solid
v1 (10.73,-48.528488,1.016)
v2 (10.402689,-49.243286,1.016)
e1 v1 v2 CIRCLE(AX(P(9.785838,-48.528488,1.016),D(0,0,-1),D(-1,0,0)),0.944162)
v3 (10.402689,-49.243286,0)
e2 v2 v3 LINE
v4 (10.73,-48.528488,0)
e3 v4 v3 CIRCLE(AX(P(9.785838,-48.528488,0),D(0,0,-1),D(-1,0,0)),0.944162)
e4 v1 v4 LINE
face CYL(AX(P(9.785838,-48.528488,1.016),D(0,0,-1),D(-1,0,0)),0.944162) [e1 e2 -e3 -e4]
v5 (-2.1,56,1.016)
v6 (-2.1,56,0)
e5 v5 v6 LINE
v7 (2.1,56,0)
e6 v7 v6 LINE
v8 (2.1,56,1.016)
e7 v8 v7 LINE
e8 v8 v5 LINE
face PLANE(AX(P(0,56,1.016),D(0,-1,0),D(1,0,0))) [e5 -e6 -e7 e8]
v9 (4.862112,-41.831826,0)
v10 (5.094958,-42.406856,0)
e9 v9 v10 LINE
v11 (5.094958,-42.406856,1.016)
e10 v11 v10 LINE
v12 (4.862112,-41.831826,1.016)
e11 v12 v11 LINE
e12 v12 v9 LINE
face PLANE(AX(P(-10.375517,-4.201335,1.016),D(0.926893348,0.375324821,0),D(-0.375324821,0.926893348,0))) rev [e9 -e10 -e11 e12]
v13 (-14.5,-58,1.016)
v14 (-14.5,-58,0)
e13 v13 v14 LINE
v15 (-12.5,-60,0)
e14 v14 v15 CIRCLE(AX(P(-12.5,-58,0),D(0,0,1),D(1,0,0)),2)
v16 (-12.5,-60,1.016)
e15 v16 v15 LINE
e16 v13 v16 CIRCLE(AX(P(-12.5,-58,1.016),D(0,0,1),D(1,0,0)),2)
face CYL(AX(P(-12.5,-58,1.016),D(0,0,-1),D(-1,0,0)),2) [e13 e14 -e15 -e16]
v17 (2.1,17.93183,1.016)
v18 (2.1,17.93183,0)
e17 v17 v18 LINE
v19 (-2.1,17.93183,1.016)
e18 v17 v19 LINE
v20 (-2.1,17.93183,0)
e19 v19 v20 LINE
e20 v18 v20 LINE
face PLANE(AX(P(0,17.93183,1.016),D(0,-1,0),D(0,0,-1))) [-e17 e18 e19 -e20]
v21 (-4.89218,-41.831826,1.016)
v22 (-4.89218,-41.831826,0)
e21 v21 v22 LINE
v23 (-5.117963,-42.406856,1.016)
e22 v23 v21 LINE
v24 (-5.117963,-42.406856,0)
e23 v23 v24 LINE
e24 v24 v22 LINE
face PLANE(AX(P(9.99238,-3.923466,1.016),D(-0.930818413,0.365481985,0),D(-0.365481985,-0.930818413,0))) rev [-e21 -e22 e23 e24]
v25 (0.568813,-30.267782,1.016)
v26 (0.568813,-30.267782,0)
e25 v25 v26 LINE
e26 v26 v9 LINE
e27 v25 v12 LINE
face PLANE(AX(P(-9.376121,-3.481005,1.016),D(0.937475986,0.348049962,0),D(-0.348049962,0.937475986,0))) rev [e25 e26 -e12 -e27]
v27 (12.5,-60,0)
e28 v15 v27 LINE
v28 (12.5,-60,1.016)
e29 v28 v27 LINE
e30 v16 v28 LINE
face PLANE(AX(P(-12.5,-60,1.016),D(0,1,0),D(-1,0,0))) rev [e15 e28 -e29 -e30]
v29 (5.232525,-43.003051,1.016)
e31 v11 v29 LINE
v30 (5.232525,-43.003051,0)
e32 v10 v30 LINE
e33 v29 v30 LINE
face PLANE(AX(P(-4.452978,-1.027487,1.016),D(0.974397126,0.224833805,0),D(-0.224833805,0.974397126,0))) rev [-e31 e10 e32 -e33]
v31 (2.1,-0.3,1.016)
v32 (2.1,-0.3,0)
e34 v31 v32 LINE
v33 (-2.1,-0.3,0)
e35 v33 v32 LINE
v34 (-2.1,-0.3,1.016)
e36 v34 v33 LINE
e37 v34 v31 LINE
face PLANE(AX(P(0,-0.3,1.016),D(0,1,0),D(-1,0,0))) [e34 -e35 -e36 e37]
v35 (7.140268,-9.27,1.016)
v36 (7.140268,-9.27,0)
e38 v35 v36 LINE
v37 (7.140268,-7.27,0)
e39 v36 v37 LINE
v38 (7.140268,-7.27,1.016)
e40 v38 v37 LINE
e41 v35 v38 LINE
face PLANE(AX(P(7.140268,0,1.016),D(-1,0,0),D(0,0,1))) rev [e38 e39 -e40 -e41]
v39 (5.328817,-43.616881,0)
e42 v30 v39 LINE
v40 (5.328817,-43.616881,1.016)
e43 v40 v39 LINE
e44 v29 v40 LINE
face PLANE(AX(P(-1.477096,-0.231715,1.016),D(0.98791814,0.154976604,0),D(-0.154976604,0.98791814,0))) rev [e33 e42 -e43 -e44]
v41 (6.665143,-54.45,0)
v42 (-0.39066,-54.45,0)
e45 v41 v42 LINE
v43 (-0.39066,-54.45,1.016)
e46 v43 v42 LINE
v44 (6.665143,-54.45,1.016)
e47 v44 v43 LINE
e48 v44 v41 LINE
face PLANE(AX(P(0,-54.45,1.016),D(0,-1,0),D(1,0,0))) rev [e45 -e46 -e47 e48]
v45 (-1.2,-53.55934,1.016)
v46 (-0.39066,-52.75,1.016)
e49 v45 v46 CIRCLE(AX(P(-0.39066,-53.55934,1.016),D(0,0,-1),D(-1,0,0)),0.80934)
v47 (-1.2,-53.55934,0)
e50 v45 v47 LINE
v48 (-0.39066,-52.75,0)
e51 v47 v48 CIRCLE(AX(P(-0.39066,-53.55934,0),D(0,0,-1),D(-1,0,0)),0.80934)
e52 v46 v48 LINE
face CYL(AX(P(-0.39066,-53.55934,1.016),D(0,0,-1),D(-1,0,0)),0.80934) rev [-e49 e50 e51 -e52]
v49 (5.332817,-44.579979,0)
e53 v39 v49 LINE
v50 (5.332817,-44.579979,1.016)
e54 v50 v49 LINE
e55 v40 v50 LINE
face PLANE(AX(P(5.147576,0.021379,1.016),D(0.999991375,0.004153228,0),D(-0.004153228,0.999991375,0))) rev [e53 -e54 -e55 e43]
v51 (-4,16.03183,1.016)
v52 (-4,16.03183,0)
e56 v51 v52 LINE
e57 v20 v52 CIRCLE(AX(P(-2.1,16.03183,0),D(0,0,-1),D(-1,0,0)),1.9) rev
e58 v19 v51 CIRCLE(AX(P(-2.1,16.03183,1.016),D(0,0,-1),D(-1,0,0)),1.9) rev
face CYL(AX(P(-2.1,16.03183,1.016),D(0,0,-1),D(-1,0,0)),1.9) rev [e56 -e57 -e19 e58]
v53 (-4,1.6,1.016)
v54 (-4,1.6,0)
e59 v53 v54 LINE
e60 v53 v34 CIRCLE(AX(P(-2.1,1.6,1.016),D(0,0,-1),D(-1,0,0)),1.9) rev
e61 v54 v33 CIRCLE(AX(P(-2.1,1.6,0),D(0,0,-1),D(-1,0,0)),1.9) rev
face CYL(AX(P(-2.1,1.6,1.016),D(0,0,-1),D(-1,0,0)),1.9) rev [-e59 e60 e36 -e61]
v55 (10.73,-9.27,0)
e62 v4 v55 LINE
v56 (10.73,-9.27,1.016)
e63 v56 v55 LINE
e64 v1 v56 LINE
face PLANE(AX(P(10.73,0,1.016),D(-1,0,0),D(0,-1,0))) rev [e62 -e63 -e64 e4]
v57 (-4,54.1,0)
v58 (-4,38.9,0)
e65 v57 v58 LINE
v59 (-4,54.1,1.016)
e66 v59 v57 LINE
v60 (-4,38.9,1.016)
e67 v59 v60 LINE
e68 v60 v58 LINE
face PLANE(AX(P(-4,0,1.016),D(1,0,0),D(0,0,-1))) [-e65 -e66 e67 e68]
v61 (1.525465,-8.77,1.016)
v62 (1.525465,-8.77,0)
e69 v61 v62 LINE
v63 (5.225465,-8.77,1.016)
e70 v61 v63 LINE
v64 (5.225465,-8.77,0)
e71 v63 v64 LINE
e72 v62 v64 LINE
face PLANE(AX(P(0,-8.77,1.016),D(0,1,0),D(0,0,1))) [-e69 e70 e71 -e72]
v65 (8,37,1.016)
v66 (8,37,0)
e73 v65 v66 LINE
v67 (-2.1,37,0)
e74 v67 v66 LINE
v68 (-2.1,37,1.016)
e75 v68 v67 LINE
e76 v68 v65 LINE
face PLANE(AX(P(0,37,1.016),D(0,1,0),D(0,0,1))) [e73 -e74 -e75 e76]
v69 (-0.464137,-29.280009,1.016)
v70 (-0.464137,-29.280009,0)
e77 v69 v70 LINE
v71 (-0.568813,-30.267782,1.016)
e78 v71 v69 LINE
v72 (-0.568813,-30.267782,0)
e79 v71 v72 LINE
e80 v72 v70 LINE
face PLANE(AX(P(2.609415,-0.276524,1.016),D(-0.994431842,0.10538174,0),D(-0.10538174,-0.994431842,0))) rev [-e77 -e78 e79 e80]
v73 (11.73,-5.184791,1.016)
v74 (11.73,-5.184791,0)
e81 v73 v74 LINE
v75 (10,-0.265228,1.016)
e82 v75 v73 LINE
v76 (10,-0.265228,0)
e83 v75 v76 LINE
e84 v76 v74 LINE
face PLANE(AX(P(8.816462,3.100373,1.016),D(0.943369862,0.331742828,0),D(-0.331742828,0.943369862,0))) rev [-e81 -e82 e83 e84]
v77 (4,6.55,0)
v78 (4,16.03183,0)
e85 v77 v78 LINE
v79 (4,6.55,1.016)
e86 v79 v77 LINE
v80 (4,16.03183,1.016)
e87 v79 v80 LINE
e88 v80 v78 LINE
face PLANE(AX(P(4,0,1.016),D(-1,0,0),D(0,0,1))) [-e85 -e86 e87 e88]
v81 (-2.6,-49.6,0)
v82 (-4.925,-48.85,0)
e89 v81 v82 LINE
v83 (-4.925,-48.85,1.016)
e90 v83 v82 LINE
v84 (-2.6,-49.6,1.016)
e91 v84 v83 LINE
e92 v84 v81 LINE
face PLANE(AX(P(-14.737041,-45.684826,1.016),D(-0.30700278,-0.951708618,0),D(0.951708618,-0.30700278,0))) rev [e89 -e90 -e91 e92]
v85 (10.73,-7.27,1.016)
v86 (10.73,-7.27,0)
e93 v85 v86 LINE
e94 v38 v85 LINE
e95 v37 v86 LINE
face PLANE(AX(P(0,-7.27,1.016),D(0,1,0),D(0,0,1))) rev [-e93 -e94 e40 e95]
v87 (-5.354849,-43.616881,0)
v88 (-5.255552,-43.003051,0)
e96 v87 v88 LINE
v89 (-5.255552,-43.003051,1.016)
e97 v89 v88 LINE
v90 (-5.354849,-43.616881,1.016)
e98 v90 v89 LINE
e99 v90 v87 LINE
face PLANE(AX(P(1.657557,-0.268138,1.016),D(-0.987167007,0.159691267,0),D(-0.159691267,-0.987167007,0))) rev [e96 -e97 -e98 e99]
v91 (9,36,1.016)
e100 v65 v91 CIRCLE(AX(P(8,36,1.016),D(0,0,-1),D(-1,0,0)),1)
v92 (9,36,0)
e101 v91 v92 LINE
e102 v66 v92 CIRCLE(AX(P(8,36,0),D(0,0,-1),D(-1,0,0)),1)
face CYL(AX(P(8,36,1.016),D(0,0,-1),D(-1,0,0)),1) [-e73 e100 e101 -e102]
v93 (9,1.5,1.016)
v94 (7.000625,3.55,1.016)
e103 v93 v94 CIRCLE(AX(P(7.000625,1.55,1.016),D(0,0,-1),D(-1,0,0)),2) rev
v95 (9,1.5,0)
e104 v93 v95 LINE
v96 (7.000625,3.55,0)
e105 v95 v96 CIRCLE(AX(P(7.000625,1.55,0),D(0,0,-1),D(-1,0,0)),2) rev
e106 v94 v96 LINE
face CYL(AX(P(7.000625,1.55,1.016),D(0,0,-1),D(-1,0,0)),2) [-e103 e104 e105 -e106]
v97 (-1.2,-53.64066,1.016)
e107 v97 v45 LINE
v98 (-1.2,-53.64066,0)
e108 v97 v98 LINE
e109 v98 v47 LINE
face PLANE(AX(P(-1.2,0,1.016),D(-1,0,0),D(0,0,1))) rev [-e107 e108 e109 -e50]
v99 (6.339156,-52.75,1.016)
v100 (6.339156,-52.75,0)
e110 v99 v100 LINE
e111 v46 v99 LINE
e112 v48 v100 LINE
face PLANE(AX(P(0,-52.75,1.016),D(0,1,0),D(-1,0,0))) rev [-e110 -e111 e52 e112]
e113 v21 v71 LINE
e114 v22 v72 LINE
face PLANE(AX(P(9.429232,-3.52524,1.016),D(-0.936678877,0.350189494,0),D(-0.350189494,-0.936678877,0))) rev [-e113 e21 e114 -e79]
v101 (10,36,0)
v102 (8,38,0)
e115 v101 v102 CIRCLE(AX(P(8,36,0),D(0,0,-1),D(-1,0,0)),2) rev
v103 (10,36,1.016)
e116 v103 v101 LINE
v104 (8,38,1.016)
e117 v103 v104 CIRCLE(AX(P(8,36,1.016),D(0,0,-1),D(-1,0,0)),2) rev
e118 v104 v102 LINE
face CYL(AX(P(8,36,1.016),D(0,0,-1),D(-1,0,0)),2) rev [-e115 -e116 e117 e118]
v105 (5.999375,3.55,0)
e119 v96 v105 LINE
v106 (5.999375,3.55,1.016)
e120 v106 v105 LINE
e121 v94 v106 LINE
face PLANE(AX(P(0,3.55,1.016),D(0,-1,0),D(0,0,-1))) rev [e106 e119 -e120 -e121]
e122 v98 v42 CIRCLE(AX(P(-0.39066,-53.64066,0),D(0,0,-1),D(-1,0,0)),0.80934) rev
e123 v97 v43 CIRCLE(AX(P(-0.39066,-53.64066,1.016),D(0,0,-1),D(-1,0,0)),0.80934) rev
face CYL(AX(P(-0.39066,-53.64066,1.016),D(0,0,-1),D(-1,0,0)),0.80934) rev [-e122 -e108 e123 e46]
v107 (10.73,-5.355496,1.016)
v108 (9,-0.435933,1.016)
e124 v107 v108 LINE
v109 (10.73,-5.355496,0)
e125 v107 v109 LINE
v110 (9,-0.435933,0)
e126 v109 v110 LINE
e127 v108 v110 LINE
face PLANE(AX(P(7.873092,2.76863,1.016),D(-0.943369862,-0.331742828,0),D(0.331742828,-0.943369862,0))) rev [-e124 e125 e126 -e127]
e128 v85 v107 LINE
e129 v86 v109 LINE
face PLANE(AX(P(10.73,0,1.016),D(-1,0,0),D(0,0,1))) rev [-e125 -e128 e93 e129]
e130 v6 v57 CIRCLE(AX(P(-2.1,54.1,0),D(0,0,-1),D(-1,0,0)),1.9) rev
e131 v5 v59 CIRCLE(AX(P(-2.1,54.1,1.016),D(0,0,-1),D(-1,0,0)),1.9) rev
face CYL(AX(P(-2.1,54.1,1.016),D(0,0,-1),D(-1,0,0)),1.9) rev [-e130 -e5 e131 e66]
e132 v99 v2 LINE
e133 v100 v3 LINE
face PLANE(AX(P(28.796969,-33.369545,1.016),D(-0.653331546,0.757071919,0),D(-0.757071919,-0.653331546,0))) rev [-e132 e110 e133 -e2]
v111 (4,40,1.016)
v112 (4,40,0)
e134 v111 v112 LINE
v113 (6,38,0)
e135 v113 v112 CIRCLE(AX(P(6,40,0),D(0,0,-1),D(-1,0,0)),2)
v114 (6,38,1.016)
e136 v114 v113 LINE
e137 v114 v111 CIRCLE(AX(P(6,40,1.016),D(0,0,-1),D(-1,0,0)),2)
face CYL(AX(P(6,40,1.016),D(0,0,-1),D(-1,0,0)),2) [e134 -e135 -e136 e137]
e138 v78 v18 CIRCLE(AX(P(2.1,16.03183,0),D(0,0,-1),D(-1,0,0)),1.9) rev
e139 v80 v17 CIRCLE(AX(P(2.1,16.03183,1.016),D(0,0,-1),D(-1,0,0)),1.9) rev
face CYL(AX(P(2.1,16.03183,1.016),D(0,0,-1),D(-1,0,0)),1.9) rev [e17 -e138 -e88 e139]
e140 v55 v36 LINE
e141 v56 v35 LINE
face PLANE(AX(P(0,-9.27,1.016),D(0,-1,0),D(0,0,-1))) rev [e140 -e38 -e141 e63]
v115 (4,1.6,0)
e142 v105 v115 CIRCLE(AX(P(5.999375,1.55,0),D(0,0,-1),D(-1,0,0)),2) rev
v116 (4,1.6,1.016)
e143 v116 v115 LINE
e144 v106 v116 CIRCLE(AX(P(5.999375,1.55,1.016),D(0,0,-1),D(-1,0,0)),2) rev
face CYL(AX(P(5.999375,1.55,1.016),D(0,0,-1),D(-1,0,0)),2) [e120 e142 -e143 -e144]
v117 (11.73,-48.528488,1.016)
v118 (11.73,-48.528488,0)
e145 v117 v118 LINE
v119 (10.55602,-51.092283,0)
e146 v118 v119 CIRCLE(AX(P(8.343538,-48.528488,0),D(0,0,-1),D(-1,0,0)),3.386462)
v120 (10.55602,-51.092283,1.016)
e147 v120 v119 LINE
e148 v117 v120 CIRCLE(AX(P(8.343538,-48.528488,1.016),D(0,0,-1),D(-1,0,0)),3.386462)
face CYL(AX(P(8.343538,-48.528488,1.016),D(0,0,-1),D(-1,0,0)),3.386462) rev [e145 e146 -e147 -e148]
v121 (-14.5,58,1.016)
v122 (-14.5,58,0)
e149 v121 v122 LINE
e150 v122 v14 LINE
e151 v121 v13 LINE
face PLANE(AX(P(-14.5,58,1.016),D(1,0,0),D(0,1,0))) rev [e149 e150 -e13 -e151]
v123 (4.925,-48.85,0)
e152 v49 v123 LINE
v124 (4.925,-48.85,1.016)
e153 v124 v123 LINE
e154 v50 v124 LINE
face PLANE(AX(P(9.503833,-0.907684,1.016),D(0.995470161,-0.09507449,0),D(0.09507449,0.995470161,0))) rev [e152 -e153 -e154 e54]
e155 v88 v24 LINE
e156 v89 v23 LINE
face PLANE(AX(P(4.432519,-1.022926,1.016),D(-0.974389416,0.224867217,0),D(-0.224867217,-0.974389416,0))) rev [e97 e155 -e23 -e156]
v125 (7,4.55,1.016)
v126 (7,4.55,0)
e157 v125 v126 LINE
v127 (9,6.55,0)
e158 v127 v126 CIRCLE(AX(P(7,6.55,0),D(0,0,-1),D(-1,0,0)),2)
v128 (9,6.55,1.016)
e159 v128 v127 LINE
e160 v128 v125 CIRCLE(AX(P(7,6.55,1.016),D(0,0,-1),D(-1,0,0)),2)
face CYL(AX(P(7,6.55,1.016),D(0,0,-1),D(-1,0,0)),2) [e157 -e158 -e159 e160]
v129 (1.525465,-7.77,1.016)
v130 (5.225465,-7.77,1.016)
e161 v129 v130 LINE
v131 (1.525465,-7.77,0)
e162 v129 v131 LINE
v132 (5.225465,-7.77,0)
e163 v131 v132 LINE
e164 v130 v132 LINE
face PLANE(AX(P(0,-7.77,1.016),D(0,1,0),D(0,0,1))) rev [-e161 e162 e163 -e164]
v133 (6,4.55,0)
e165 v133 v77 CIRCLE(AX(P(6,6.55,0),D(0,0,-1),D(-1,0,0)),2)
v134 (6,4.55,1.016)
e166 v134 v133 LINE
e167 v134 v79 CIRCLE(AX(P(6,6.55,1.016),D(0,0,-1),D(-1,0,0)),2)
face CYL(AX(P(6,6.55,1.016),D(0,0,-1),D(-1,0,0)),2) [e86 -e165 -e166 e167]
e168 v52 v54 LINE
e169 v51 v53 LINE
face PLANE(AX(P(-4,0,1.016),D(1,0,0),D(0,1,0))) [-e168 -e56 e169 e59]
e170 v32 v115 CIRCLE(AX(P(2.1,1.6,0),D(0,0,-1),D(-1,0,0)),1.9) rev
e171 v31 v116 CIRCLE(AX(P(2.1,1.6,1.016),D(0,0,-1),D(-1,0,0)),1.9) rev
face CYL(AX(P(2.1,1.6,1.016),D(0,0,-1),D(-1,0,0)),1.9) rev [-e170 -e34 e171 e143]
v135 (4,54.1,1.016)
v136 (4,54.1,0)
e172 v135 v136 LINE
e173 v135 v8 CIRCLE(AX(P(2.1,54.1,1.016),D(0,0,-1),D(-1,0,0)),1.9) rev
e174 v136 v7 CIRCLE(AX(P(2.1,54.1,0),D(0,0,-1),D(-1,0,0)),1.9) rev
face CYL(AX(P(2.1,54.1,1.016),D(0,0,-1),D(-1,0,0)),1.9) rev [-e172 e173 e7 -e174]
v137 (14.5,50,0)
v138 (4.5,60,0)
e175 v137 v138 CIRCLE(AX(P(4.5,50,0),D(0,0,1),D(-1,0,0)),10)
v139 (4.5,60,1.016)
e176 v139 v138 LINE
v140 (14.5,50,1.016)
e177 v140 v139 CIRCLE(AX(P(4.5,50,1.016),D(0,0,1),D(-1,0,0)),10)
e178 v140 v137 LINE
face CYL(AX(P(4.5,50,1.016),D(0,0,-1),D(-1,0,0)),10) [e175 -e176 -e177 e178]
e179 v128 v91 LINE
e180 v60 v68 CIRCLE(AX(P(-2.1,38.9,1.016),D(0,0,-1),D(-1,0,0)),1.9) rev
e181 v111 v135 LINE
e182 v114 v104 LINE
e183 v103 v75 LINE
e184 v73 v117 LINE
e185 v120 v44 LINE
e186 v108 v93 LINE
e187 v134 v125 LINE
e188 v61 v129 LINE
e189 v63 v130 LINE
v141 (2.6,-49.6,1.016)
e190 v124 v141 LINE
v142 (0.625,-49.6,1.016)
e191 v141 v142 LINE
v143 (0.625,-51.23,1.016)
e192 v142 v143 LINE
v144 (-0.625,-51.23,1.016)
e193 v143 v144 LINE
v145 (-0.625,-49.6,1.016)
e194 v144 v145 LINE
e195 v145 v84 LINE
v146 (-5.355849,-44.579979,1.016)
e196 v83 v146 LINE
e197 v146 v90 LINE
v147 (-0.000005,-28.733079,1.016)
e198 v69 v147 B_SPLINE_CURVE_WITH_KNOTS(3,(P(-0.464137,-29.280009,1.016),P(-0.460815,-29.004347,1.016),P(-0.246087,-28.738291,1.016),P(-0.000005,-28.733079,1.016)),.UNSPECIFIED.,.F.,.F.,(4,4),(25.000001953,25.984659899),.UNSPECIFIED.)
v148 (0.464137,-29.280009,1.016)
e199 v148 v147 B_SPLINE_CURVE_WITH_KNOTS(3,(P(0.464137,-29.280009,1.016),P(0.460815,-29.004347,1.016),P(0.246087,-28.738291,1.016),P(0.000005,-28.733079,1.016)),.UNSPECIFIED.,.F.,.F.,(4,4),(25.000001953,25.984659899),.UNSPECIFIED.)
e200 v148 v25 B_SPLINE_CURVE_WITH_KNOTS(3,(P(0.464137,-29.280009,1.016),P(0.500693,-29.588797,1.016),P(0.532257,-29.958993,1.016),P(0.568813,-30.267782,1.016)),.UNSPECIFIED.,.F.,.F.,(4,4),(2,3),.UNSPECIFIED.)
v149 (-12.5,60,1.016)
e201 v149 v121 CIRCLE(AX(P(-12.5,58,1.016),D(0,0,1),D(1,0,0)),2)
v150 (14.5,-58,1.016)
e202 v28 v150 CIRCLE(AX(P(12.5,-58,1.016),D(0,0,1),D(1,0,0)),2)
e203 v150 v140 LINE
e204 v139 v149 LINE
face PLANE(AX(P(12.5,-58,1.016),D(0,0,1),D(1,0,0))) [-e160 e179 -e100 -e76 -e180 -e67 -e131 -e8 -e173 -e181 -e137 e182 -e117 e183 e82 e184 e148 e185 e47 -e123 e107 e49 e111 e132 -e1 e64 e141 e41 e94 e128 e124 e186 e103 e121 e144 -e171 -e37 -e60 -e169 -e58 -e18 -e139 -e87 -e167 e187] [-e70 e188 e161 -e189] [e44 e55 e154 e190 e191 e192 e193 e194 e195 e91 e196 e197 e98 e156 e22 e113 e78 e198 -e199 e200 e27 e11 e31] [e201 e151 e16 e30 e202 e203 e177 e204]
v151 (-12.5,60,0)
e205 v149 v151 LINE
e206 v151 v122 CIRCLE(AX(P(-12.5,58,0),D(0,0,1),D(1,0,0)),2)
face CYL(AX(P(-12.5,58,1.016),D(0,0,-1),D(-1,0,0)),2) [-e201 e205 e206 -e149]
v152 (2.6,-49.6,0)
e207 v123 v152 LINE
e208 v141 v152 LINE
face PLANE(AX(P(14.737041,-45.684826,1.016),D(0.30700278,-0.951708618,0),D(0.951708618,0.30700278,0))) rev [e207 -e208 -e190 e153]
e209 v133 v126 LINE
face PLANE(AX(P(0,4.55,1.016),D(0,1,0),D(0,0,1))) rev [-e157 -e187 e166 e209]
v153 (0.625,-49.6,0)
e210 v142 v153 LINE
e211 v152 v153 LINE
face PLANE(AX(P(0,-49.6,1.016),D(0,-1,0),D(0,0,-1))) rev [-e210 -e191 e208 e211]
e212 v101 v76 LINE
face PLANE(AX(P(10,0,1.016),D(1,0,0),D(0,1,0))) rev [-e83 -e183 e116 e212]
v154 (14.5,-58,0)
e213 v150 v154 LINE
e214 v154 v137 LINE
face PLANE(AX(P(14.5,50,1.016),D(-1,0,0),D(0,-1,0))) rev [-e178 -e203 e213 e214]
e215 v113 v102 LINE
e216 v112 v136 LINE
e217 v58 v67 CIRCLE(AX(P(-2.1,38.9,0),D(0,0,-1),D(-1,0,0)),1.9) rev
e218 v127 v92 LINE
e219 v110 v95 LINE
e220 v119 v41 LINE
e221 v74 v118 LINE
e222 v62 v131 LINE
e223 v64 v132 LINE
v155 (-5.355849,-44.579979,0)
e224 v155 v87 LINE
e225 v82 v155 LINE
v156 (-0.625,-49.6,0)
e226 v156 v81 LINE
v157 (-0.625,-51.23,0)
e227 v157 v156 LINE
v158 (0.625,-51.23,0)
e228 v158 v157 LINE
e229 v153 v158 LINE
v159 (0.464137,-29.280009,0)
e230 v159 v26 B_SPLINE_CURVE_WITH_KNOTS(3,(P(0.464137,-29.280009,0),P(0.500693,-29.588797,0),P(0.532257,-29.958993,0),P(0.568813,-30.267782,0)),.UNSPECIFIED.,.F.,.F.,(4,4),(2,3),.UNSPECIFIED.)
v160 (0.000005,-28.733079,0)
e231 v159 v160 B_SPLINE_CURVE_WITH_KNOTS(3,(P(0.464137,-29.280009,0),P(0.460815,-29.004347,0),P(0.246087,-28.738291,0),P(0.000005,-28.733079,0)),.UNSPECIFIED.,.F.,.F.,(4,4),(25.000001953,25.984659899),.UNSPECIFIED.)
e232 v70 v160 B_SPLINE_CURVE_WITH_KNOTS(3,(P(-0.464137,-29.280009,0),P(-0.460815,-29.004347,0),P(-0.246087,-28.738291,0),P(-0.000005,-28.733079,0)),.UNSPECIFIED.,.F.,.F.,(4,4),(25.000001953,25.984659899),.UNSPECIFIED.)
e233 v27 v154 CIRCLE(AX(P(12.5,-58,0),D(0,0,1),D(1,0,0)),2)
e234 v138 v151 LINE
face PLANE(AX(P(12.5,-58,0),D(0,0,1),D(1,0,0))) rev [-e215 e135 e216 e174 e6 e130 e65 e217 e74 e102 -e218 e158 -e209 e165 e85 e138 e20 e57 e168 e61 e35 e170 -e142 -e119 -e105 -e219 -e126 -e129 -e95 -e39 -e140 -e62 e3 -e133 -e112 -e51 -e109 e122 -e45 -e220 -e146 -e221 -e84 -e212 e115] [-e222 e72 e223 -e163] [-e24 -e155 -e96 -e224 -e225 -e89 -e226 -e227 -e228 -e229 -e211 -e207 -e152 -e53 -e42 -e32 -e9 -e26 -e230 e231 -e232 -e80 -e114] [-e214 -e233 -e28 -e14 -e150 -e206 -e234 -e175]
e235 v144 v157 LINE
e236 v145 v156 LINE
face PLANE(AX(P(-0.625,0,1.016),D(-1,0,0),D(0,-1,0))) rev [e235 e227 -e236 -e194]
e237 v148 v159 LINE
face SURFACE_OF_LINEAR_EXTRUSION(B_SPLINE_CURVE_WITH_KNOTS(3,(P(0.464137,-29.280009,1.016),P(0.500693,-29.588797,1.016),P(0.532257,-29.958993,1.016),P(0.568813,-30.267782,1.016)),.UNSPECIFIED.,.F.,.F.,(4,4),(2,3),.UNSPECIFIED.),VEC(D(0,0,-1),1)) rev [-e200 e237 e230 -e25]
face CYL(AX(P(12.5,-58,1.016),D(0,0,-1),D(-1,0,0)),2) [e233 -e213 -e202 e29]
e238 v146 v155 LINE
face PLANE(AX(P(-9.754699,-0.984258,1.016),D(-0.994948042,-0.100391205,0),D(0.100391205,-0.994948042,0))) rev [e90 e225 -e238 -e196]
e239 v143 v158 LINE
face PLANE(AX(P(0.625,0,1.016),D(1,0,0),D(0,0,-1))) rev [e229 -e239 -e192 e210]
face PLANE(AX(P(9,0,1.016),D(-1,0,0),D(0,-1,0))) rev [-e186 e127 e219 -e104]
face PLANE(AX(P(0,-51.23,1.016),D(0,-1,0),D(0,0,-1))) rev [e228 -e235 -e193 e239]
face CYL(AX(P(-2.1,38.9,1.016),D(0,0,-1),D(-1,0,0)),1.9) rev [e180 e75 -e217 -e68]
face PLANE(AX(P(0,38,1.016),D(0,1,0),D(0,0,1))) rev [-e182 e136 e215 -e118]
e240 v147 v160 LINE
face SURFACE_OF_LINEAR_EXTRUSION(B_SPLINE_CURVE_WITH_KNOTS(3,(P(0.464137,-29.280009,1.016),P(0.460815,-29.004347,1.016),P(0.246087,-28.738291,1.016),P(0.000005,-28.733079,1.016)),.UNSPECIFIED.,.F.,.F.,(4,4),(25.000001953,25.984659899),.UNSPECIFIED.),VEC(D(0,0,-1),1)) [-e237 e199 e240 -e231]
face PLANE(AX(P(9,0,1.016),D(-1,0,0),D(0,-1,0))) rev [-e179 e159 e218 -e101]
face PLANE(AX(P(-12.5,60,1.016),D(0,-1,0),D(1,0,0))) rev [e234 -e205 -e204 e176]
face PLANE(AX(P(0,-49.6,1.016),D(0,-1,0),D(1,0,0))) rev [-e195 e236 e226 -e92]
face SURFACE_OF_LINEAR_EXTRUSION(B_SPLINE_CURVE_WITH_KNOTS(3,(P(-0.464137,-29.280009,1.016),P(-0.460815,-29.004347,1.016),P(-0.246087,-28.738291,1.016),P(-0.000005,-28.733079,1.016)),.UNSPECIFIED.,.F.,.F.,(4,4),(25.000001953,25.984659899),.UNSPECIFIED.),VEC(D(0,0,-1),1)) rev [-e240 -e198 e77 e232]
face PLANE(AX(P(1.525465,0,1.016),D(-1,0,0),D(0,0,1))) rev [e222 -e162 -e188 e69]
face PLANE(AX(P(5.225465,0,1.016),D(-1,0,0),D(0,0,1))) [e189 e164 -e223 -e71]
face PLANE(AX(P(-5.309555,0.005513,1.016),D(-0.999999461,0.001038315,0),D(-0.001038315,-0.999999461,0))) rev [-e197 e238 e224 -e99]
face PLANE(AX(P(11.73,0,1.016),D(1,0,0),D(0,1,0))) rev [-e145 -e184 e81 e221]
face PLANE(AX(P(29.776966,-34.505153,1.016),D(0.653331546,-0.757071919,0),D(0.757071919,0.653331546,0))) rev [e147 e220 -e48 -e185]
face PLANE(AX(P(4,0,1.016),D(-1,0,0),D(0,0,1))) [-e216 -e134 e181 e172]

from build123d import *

# Parameters (mm, degrees)
BOSS_EXTRUDE4_DEPTH    = 1.016
CUT_EXTRUDE2_OUTLINE_W = 3.7
CUT_EXTRUDE2_OUTLINE_H = 1
CUT_EXTRUDE2_DEPTH     = 1.016


with BuildPart() as part:
    # Sketch6 → Boss-Extrude4 (new body)
    with BuildSketch(Plane.XY):
        with BuildLine():
            Line((-12.5, 60), (4.5, 60))
            ThreePointArc((4.5, 60), (11.571067812, 57.071067812), (14.5, 50))
            Line((14.5, 50), (14.5, -58))
            ThreePointArc((14.5, -58), (13.914213562, -59.414213562), (12.5, -60))
            Line((12.5, -60), (-12.5, -60))
            ThreePointArc((-12.5, -60), (-13.914213562, -59.414213562), (-14.5, -58))
            Line((-14.5, -58), (-14.5, 58))
            ThreePointArc((-14.5, 58), (-13.914213562, 59.414213562), (-12.5, 60))
        make_face()
    extrude(amount=BOSS_EXTRUDE4_DEPTH)

    # Cut-Extrude2: read off the stored shape, not the designer's step
    # Cut-Extrude2 outline → Cut-Extrude2 (cut)
    with BuildSketch(Plane.XY):
        with BuildLine():
            add(Edge.make_bspline(
                [(0.464136716, -29.280008599), (0.50069296, -29.588797386), (0.532256612, -29.958993284), (0.568812856, -30.267782071)],
                knots=[2, 2, 2, 2, 3, 3, 3, 3], degree=3))
            add(Edge.make_bspline(
                [(0.464136716, -29.280008599), (0.460815442, -29.004347325), (0.24608723, -28.738291079), (4.711e-06, -28.733078818)],
                knots=[25.000001953, 25.000001953, 25.000001953, 25.000001953, 25.984659899, 25.984659899, 25.984659899, 25.984659899], degree=3))
            add(Edge.make_bspline(
                [(-0.464136716, -29.280008613), (-0.460815442, -29.004347325), (-0.24608723, -28.738291079), (4.711e-06, -28.733078818)],
                knots=[25.000001953, 25.000001953, 25.000001953, 25.000001953, 25.984659899, 25.984659899, 25.984659899, 25.984659899], degree=3))
            Line((-0.464136716, -29.280008613), (-0.568812856, -30.267782071))
            Line((-0.568812856, -30.267782071), (-4.892180174, -41.831826427))
            Line((-4.892180174, -41.831826427), (-5.117963119, -42.406855927))
            Line((-5.117963119, -42.406855927), (-5.25555162, -43.003051232))
            Line((-5.25555162, -43.003051232), (-5.354849178, -43.616881121))
            Line((-5.354849178, -43.616881121), (-5.355849178, -44.579979095))
            Line((-5.355849178, -44.579979095), (-4.925, -48.85))
            Line((-4.925, -48.85), (-2.6, -49.6))
            Line((-2.6, -49.6), (-0.625, -49.6))
            Line((-0.625, -49.6), (-0.625, -51.23))
            Line((-0.625, -51.23), (0.625, -51.23))
            Line((0.625, -51.23), (0.625, -49.6))
            Line((0.625, -49.6), (2.6, -49.6))
            Line((2.6, -49.6), (4.925, -48.85))
            Line((4.925, -48.85), (5.332817408, -44.579979095))
            Line((5.332817408, -44.579979095), (5.328817408, -43.616881121))
            Line((5.328817408, -43.616881121), (5.232524742, -43.003051232))
            Line((5.232524742, -43.003051232), (5.094957773, -42.406855927))
            Line((5.094957773, -42.406855927), (4.862112382, -41.831826427))
            Line((4.862112382, -41.831826427), (0.568812856, -30.267782071))
        make_face()
        with BuildLine():
            ThreePointArc((4, 16.031829774), (3.443502884, 17.375332658), (2.1, 17.931829774))
            Line((2.1, 17.931829774), (-2.1, 17.931829774))
            ThreePointArc((-2.1, 17.931829774), (-3.443502884, 17.375332658), (-4, 16.031829774))
            Line((-4, 16.031829774), (-4, 1.6))
            ThreePointArc((-4, 1.6), (-3.443502884, 0.256497116), (-2.1, -0.3))
            Line((-2.1, -0.3), (2.1, -0.3))
            ThreePointArc((2.1, -0.3), (3.443502884, 0.256497116), (4, 1.6))
            ThreePointArc((4, 1.6), (4.602950898, 2.981782106), (5.999374902, 3.55))
            Line((5.999374902, 3.55), (7.000625098, 3.55))
            ThreePointArc((7.000625098, 3.55), (8.432407204, 2.946424004), (9, 1.5))
            Line((9, 1.5), (9, -0.435932815))
            Line((9, -0.435932815), (10.73, -5.355496174))
            Line((10.73, -5.355496174), (10.73, -7.27))
            Line((10.73, -7.27), (7.140268475, -7.27))
            Line((7.140268475, -7.27), (7.140268475, -9.27))
            Line((7.140268475, -9.27), (10.73, -9.27))
            Line((10.73, -9.27), (10.73, -48.528487843))
            ThreePointArc((10.73, -48.528487843), (10.644281066, -48.921574831), (10.402688829, -49.243286359))
            Line((10.402688829, -49.243286359), (6.339155629, -52.75))
            Line((6.339155629, -52.75), (-0.390660403, -52.75))
            ThreePointArc((-0.390660403, -52.75), (-0.96294992, -52.98705008), (-1.2, -53.559339597))
            Line((-1.2, -53.559339597), (-1.2, -53.640660403))
            ThreePointArc((-1.2, -53.640660403), (-0.96294992, -54.21294992), (-0.390660403, -54.45))
            Line((-0.390660403, -54.45), (6.665142853, -54.45))
            Line((6.665142853, -54.45), (10.556020375, -51.092283301))
            ThreePointArc((10.556020375, -51.092283301), (11.422548586, -49.938388133), (11.73, -48.528487843))
            Line((11.73, -48.528487843), (11.73, -5.184791238))
            Line((11.73, -5.184791238), (10, -0.265227879))
            Line((10, -0.265227879), (10, 36))
            ThreePointArc((10, 36), (9.414213562, 37.414213562), (8, 38))
            Line((8, 38), (6, 38))
            ThreePointArc((6, 38), (4.585786438, 38.585786438), (4, 40))
            Line((4, 40), (4, 54.1))
            ThreePointArc((4, 54.1), (3.443502884, 55.443502884), (2.1, 56))
            Line((2.1, 56), (-2.1, 56))
            ThreePointArc((-2.1, 56), (-3.443502884, 55.443502884), (-4, 54.1))
            Line((-4, 54.1), (-4, 38.9))
            ThreePointArc((-4, 38.9), (-3.443502884, 37.556497116), (-2.1, 37))
            Line((-2.1, 37), (8, 37))
            ThreePointArc((8, 37), (8.707106781, 36.707106781), (9, 36))
            Line((9, 36), (9, 6.55))
            ThreePointArc((9, 6.55), (8.414213562, 5.135786438), (7, 4.55))
            Line((7, 4.55), (6, 4.55))
            ThreePointArc((6, 4.55), (4.585786438, 5.135786438), (4, 6.55))
            Line((4, 6.55), (4, 16.031829774))
        make_face()
        with Locations((3.375465258, -8.27)):
            Rectangle(CUT_EXTRUDE2_OUTLINE_W, CUT_EXTRUDE2_OUTLINE_H)
    extrude(amount=CUT_EXTRUDE2_DEPTH, mode=Mode.SUBTRACT)


solid = part.part
